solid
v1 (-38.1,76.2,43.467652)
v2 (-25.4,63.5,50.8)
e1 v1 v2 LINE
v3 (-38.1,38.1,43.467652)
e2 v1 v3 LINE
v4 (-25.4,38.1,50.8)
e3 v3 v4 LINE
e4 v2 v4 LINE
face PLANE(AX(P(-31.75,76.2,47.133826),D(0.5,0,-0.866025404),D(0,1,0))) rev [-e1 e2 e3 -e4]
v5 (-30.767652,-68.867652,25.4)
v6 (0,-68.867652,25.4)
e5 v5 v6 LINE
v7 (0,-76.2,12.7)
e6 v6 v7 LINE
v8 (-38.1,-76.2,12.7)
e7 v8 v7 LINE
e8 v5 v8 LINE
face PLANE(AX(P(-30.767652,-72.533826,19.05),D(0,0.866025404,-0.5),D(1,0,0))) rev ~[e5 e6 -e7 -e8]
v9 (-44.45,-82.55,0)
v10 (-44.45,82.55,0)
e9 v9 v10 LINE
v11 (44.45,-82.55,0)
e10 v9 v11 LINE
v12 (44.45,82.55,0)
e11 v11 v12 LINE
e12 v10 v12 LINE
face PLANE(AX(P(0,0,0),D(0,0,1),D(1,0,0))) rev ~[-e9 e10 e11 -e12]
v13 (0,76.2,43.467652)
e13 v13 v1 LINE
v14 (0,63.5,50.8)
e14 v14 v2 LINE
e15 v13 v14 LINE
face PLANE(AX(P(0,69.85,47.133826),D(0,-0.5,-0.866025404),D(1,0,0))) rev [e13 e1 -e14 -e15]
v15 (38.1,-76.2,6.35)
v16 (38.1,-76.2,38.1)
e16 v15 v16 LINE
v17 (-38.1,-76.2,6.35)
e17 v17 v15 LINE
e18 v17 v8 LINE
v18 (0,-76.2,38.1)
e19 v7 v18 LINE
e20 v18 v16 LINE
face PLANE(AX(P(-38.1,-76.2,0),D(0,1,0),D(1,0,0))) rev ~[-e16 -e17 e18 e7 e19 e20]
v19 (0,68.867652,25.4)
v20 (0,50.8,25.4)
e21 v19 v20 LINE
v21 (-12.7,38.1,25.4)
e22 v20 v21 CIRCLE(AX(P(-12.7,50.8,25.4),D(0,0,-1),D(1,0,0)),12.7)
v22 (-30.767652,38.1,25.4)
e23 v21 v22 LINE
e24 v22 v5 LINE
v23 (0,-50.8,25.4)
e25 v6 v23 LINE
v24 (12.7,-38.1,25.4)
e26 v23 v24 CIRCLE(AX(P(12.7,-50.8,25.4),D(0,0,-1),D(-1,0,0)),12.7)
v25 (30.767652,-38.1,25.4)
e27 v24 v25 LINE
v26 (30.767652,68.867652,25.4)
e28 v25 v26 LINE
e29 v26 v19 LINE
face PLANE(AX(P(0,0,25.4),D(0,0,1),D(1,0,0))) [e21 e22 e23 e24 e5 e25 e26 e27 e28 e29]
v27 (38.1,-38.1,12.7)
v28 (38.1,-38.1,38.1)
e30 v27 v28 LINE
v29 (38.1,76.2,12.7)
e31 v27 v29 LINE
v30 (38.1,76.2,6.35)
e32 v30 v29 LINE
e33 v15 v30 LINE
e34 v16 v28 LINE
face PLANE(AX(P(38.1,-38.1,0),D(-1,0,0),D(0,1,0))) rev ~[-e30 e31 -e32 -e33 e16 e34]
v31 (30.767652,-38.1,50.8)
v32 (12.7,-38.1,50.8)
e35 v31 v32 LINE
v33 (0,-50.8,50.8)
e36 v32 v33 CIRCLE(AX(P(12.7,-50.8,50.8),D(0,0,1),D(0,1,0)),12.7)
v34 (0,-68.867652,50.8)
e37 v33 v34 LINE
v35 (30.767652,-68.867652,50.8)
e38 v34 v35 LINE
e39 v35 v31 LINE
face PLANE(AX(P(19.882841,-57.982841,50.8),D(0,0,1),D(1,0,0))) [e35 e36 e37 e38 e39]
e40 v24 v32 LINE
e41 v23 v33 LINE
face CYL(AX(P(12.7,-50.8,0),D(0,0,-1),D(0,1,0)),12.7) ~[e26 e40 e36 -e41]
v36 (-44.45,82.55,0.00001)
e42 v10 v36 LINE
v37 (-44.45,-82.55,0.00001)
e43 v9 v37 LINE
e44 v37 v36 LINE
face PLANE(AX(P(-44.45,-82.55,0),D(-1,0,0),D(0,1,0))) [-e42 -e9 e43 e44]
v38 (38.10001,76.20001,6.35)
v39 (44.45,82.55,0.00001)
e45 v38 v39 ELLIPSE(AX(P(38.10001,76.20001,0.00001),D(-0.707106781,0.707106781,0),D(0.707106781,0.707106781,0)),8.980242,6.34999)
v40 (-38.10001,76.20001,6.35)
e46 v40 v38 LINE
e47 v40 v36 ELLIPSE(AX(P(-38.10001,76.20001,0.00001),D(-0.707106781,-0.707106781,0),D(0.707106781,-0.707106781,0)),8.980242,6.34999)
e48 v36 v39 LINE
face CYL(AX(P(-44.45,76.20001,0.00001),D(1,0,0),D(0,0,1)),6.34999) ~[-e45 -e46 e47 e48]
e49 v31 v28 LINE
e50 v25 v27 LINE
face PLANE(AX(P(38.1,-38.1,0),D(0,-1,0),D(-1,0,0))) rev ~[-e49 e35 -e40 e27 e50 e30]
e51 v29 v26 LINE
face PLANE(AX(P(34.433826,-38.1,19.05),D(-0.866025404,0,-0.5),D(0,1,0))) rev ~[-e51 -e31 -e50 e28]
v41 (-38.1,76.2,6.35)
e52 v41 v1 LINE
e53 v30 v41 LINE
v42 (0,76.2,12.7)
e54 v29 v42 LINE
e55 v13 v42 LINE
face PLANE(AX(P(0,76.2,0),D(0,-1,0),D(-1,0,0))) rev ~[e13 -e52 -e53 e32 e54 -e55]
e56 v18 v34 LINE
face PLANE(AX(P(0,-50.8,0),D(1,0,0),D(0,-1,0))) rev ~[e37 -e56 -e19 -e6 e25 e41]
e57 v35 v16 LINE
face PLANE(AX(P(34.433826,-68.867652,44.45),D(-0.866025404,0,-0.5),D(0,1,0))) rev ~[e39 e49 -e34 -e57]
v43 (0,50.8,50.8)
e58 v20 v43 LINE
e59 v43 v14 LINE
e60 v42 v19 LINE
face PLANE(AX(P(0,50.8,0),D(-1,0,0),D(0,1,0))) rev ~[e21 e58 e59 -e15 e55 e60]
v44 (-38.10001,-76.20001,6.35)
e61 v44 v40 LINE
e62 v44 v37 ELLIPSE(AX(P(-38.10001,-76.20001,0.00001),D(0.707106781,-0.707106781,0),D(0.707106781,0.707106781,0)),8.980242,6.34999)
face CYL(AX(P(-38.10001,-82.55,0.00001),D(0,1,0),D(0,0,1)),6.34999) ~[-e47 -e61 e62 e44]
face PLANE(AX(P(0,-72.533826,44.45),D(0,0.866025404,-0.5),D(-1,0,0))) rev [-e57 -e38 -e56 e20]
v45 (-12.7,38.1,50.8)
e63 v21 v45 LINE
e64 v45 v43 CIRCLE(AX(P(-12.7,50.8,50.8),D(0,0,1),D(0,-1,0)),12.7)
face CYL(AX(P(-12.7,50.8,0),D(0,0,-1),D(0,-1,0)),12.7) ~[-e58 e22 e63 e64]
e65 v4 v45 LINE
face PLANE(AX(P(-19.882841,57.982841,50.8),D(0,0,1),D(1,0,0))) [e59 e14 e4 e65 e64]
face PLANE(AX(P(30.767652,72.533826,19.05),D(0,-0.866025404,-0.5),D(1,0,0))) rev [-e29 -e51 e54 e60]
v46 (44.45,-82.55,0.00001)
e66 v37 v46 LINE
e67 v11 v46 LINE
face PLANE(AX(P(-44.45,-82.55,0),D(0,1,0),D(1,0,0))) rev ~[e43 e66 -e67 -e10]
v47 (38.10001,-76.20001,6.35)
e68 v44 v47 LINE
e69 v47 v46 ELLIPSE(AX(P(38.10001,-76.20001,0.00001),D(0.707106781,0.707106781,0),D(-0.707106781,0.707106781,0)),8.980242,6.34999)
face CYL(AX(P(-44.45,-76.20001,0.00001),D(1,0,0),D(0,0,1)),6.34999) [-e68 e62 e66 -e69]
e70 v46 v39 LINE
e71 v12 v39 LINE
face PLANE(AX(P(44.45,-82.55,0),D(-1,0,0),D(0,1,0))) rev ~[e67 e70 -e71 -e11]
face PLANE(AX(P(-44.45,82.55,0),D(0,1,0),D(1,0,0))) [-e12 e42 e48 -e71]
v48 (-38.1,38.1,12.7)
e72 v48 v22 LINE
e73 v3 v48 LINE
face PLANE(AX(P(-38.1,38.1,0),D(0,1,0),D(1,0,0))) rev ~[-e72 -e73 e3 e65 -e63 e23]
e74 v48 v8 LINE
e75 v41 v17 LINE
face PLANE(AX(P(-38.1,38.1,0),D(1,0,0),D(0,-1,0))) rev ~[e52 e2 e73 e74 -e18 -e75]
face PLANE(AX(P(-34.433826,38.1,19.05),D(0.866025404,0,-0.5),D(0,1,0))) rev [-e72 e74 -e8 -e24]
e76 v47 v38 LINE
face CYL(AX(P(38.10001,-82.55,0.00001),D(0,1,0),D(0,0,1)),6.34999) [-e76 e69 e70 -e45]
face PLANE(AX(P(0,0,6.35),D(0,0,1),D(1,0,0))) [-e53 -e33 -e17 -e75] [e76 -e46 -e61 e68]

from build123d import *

# Parameters (mm, degrees)
F0_W        = 88.9
F0_H        = 165.1
F1_DEPTH    = 6.35
F2_DEPTH    = 25.4
F3_DEPTH    = 50.8
F4_C1_SIZE2 = 12.7
F4_C1_SIZE  = 7.3323484187
F4_C2_SIZE2 = 7.3323484187
F4_C2_SIZE  = 12.7
F4_C3_SIZE2 = 12.7
F4_C3_SIZE  = 7.3323484187
F4_C4_SIZE2 = 7.3323484187
F4_C4_SIZE  = 12.7
F4_C5_SIZE2 = 12.7
F4_C5_SIZE  = 7.3323484187
F4_C6_SIZE2 = 7.3323484187
F4_C6_SIZE  = 12.7
F4_C7_SIZE2 = 12.7
F4_C7_SIZE  = 7.3323484187
F4_C8_SIZE2 = 12.7
F4_C8_SIZE  = 7.3323484187
F5_R        = 6.34999


# Not quite as in the source:
# - a fillet or chamfer is up to 0.001 mm smaller than in the source, because OpenCascade refuses the exact size


with BuildPart() as f1:
    # F0 (on Top) → F1 (new body)
    with BuildSketch(Plane.XY):
        Rectangle(F0_W, F0_H)
        Polygon((0, 76.2), (38.1, 76.2), (38.1, -38.1), (38.1, -76.2), (0, -76.2), (-38.1, -76.2), (-38.1, 38.1), (-38.1, 76.2), align=None, mode=Mode.SUBTRACT)
    extrude(amount=F1_DEPTH)

    # F0 (on Top) → F2 (join)
    with BuildSketch(Plane.XY):
        with BuildLine():
            Line((38.1, -38.1), (38.1, 76.2))
            Line((38.1, 76.2), (0, 76.2))
            Line((0, 76.2), (0, 50.8))
            ThreePointArc((0, 50.8), (-3.7197438789, 41.8197438789), (-12.7, 38.1))
            Line((-12.7, 38.1), (-38.1, 38.1))
            Line((-38.1, 38.1), (-38.1, -76.2))
            Line((-38.1, -76.2), (0, -76.2))
            Line((0, -76.2), (0, -50.8))
            ThreePointArc((0, -50.8), (3.7197438789, -41.8197438789), (12.7, -38.1))
            Line((12.7, -38.1), (38.1, -38.1))
        make_face()
    extrude(amount=F2_DEPTH)

    # F0 (on Top) → F3 (join)
    with BuildSketch(Plane.XY):
        with BuildLine():
            Line((0, 50.8), (0, 76.2))
            Line((0, 76.2), (-38.1, 76.2))
            Line((-38.1, 76.2), (-38.1, 38.1))
            Line((-38.1, 38.1), (-12.7, 38.1))
            ThreePointArc((-12.7, 38.1), (-3.7197438789, 41.8197438789), (0, 50.8))
        make_face()
        with BuildLine():
            Line((38.1, -76.2), (38.1, -38.1))
            Line((38.1, -38.1), (12.7, -38.1))
            ThreePointArc((12.7, -38.1), (3.7197438789, -41.8197438789), (0, -50.8))
            Line((0, -50.8), (0, -76.2))
            Line((0, -76.2), (38.1, -76.2))
        make_face()
    extrude(amount=F3_DEPTH)

    # F4: chamfer of 12.7 x 7.3323484187 on 8 edges, made by hand

    # F4_c1
    f4_c1_edges = [f1.edges().sort_by_distance(p)[0] for p in [
        (-38.1, 57.15, 50.8),
    ]]
    f4_c1_side = f1.faces().sort_by_distance((-38.1, 57.15, 50.6533530316))[0]
    chamfer(f4_c1_edges, length=F4_C1_SIZE, length2=F4_C1_SIZE2, reference=f4_c1_side)

    # F4_c2
    f4_c2_edges = [f1.edges().sort_by_distance(p)[0] for p in [
        (-38.1, -19.05, 25.4),
    ]]
    f4_c2_side = f1.faces().sort_by_distance((-38.1, -19.05, 25.2533530316))[0]
    chamfer(f4_c2_edges, length=F4_C2_SIZE, length2=F4_C2_SIZE2, reference=f4_c2_side)

    # F4_c3
    f4_c3_edges = [f1.edges().sort_by_distance(p)[0] for p in [
        (38.1, 19.05, 25.4),
    ]]
    f4_c3_side = f1.faces().sort_by_distance((37.9533530316, 19.05, 25.4))[0]
    chamfer(f4_c3_edges, length=F4_C3_SIZE, length2=F4_C3_SIZE2, reference=f4_c3_side)

    # F4_c4
    f4_c4_edges = [f1.edges().sort_by_distance(p)[0] for p in [
        (15.3838257906, 76.2, 25.4),
    ]]
    f4_c4_side = f1.faces().sort_by_distance((15.3838257906, 76.2, 25.2533530316))[0]
    chamfer(f4_c4_edges, length=F4_C4_SIZE, length2=F4_C4_SIZE2, reference=f4_c4_side)

    # F4_c5
    f4_c5_edges = [f1.edges().sort_by_distance(p)[0] for p in [
        (-15.3838257906, -76.2, 25.4),
    ]]
    f4_c5_side = f1.faces().sort_by_distance((-15.3838257906, -76.0533530316, 25.4))[0]
    chamfer(f4_c5_edges, length=F4_C5_SIZE, length2=F4_C5_SIZE2, reference=f4_c5_side)

    # F4_c6
    f4_c6_edges = [f1.edges().sort_by_distance(p)[0] for p in [
        (19.05, -76.2, 50.8),
    ]]
    f4_c6_side = f1.faces().sort_by_distance((19.05, -76.2, 50.6533530316))[0]
    chamfer(f4_c6_edges, length=F4_C6_SIZE, length2=F4_C6_SIZE2, reference=f4_c6_side)

    # F4_c7
    f4_c7_edges = [f1.edges().sort_by_distance(p)[0] for p in [
        (38.1, -53.4838257906, 50.8),
    ]]
    f4_c7_side = f1.faces().sort_by_distance((37.9533530316, -53.4838257906, 50.8))[0]
    chamfer(f4_c7_edges, length=F4_C7_SIZE, length2=F4_C7_SIZE2, reference=f4_c7_side)

    # F4_c8
    f4_c8_edges = [f1.edges().sort_by_distance(p)[0] for p in [
        (-12.7, 76.2, 50.8),
    ]]
    f4_c8_side = f1.faces().sort_by_distance((-12.7, 76.2, 50.6533530316))[0]
    chamfer(f4_c8_edges, length=F4_C8_SIZE, length2=F4_C8_SIZE2, reference=f4_c8_side)

    # F5 (radius 6.35 in the source; OpenCascade refuses exactly that, so slightly less here)
    f5_edges = [f1.edges().sort_by_distance(p)[0] for p in [
        (44.45, 0, 6.35),
        (0, 82.55, 6.35),
        (0, -82.55, 6.35),
        (-44.45, 0, 6.35),
    ]]
    fillet(f5_edges, radius=F5_R)


solid = f1.part
